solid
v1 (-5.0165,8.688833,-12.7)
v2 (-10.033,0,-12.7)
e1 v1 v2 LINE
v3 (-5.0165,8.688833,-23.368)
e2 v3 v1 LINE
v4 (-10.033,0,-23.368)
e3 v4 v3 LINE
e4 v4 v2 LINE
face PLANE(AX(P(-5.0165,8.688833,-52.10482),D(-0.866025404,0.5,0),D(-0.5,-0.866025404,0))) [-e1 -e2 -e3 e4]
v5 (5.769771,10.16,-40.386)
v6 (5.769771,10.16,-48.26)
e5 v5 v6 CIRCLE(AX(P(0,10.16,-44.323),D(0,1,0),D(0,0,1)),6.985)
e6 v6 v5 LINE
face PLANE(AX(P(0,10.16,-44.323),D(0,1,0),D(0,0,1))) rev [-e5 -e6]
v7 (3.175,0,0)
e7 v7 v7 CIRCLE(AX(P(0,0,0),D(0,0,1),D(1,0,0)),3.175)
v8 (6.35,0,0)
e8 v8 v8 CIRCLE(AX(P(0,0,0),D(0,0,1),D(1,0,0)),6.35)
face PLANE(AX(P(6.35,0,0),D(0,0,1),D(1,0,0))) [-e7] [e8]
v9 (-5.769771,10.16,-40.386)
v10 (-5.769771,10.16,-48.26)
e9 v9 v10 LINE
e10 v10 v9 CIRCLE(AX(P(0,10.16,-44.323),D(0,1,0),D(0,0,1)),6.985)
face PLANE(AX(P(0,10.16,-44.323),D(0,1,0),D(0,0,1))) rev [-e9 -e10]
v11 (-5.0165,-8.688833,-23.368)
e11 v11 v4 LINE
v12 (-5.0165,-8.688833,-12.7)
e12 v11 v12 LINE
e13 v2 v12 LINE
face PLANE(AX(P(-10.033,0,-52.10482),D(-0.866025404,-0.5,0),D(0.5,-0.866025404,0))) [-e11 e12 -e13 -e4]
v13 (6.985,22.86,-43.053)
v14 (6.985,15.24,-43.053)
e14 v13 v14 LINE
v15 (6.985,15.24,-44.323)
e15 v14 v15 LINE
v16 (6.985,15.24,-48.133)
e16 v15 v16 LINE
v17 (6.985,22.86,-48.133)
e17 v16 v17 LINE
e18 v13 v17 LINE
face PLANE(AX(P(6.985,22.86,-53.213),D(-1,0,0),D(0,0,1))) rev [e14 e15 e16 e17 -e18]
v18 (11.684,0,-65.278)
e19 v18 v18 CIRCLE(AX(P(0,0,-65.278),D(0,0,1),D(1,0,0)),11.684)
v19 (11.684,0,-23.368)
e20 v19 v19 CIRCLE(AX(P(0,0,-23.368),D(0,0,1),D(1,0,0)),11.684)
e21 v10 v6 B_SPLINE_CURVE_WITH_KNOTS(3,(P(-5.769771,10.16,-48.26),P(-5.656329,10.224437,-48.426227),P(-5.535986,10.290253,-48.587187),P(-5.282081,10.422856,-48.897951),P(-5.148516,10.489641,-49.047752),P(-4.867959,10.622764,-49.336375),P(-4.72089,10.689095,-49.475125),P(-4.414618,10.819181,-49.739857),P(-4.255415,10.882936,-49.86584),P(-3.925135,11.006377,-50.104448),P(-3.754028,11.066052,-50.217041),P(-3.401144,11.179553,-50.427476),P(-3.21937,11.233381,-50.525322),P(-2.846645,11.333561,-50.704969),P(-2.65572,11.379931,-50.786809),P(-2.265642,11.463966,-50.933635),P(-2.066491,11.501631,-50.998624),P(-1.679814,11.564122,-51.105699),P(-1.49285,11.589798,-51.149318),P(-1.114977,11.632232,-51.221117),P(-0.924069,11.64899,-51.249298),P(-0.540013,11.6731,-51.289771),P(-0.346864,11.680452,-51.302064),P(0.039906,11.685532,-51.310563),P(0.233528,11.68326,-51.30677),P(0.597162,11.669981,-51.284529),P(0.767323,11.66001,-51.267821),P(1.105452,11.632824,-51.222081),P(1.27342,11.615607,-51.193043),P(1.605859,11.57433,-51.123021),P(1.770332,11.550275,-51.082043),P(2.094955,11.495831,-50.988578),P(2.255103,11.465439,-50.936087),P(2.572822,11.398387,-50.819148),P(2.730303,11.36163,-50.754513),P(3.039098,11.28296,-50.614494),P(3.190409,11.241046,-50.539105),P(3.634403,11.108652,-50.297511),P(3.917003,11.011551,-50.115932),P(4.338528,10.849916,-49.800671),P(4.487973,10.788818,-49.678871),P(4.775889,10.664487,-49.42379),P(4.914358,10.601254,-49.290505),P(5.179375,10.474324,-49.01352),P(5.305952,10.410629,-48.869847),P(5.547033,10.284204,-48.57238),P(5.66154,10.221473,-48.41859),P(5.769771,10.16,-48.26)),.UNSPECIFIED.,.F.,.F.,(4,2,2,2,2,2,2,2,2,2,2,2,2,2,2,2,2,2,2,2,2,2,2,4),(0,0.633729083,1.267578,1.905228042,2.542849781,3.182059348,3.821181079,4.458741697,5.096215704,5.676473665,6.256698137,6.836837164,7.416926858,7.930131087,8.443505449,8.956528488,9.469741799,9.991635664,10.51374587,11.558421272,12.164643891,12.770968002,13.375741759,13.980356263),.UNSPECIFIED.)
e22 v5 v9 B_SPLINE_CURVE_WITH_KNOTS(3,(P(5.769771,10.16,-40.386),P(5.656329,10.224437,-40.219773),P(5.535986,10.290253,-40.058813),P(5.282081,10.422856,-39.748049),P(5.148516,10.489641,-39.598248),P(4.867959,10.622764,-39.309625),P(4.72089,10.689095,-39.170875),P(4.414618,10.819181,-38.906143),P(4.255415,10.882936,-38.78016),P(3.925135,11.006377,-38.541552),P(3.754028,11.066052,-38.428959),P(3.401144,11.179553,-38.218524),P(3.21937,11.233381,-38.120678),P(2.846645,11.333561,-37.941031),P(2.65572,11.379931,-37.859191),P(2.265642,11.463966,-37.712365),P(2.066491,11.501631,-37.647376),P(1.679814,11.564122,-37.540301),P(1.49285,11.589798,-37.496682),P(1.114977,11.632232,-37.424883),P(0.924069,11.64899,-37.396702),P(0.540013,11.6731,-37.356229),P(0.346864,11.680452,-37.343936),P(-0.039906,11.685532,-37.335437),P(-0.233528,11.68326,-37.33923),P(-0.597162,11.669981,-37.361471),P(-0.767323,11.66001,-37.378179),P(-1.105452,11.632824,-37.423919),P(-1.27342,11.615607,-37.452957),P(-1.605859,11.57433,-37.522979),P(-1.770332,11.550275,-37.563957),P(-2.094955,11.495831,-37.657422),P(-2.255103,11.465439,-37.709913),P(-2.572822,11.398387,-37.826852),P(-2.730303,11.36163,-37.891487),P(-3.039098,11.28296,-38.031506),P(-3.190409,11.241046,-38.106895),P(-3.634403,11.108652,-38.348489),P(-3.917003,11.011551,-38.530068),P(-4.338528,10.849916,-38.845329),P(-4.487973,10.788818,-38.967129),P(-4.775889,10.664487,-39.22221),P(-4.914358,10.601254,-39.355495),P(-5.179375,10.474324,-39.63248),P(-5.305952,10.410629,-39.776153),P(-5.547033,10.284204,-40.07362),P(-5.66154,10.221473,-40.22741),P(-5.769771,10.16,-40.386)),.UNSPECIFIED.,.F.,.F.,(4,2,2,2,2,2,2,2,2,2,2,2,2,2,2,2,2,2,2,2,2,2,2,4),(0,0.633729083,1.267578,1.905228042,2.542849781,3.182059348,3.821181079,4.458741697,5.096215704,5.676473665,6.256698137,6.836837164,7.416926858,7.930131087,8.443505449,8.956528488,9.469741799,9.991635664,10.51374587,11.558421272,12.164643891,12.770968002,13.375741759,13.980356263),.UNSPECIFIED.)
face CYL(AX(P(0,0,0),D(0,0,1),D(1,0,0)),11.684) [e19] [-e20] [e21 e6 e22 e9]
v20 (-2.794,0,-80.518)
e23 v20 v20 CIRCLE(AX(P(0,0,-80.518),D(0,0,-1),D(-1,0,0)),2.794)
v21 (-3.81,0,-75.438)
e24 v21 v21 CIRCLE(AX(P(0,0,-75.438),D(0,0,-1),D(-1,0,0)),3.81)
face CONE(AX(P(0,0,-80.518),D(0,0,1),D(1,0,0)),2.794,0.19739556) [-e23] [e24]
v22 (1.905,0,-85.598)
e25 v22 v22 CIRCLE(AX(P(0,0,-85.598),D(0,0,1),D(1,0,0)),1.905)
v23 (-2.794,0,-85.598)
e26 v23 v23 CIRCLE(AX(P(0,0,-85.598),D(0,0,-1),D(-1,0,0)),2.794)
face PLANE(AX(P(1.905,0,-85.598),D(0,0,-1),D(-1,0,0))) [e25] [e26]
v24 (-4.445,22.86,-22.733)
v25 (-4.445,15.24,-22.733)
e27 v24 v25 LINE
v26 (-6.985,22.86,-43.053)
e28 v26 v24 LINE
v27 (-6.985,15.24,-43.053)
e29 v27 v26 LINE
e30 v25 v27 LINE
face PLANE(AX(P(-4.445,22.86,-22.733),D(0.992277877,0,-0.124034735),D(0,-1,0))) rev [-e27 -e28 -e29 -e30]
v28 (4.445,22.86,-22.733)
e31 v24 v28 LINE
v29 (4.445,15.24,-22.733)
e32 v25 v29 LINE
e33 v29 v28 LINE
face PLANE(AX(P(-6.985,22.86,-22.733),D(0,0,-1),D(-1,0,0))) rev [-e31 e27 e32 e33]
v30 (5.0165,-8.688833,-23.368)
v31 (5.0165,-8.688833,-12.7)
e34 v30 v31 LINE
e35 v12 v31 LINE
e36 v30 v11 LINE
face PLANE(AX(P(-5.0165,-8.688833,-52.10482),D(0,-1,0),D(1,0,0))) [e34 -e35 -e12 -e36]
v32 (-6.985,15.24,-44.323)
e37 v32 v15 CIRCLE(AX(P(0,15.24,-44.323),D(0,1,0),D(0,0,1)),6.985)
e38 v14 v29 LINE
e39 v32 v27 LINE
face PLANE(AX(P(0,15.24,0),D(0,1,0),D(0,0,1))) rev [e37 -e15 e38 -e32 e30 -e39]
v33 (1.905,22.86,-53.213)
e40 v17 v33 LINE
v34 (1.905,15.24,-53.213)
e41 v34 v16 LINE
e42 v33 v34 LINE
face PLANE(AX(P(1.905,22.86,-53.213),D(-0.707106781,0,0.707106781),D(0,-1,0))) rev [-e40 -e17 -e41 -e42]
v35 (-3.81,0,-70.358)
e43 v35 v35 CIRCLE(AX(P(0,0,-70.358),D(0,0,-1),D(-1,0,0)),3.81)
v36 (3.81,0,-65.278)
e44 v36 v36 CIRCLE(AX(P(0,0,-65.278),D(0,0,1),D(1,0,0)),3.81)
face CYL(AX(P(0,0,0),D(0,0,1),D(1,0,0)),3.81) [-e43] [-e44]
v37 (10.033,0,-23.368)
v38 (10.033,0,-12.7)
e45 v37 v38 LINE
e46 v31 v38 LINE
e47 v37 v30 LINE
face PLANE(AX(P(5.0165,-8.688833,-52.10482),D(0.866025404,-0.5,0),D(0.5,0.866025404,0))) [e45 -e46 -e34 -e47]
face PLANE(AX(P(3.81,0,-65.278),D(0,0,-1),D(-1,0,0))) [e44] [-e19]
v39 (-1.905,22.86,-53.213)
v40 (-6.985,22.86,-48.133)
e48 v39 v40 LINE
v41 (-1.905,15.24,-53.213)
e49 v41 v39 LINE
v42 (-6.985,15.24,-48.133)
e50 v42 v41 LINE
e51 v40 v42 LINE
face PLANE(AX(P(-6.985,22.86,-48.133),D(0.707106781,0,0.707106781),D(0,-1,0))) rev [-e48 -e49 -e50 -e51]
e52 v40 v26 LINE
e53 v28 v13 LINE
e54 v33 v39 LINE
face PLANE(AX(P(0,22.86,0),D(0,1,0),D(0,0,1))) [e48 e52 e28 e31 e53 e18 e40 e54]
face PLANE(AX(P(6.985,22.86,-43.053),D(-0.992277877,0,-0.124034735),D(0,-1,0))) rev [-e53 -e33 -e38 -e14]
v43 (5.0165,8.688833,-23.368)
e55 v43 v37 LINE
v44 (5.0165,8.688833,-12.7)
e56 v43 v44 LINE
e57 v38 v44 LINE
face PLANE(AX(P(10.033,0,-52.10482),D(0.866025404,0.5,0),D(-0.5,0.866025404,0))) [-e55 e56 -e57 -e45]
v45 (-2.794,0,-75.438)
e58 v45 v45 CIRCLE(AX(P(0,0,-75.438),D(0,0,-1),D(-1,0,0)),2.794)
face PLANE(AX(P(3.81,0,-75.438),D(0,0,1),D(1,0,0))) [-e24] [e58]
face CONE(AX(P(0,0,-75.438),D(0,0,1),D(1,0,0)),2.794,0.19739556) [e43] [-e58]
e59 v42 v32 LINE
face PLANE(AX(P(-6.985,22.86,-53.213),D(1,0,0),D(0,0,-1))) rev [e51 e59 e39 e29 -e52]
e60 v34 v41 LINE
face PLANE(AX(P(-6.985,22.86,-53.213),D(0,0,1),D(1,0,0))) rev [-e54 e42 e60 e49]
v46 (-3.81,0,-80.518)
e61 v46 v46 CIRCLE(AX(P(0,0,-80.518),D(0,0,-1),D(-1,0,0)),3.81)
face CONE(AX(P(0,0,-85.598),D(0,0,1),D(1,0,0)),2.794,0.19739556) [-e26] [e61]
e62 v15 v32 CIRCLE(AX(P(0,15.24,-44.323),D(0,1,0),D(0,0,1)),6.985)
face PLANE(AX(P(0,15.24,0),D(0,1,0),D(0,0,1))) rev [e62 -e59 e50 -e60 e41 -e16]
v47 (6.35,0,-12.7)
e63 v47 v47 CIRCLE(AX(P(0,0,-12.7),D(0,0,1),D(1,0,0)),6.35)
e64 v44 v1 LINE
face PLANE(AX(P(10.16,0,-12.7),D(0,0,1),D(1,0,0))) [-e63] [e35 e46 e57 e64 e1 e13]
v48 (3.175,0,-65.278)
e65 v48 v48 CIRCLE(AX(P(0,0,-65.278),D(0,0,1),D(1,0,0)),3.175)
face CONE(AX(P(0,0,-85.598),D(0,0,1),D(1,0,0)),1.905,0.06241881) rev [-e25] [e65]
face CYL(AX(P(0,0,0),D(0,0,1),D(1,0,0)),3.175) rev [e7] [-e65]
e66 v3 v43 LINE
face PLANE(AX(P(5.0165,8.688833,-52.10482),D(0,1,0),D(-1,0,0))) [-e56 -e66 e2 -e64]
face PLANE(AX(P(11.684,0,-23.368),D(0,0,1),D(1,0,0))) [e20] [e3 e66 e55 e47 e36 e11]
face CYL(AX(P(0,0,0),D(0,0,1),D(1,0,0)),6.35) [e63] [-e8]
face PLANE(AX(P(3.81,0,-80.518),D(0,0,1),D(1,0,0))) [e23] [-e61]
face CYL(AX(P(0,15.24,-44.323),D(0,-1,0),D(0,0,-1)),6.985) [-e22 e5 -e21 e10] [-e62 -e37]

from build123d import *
from OCP.BRepFilletAPI import BRepFilletAPI_MakeChamfer

# Parameters (mm, degrees)
SKETCH3_R           = 10.16
CUT_EXTRUDE1_DEPTH  = 10.668
SKETCH4_R           = 6.985
BOSS_EXTRUDE1_DEPTH = 5.08
SKETCH5_W           = 13.97
SKETCH5_H           = 30.48
BOSS_EXTRUDE2_DEPTH = 7.62
CHAMFER1_SIZE       = 5.08
CHAMFER2_SIZE       = 20.32
CHAMFER2_SIZE2      = 2.54


# Read off the part's stored shape, not the designer's step: LPattern8
with BuildPart() as part:
    # Sketch1 → Revolve1 (revolve)
    with BuildSketch(Plane(origin=(0, 0, 0), x_dir=(1, 0, 0), z_dir=(0, 1, 0))):
        Polygon((3.81, 85.598), (3.81, 65.278), (11.684, 65.278), (11.684, 23.368), (10.16, 23.368), (10.16, 12.7), (6.35, 12.7), (6.35, 0), (3.175, 0), (3.175, 65.278), (1.905, 85.598), align=None)
    revolve(axis=Axis((0, 0, 0), (0, 0, -1)))

    # Sketch2 → Cut-Revolve1 (revolve, cut)
    with BuildSketch(Plane(origin=(0, 0, 0), x_dir=(1, 0, 0), z_dir=(0, 1, 0))):
        Polygon((3.81, 85.598), (2.794, 85.598), (3.81, 80.518), align=None)
    revolve(axis=Axis((0, 0, 0), (0, 0, 1)), mode=Mode.SUBTRACT)

    # LPattern8 outline → LPattern8 (revolve, cut)
    with BuildSketch(Plane.XZ):
        Polygon((3.81, -75.438), (2.794, -80.518), (3.81, -80.518), align=None)
        Polygon((2.794, -75.438), (3.81, -75.438), (3.81, -70.358), align=None)
    revolve(axis=Axis((0, 0, 0), (0, 0, 1)), mode=Mode.SUBTRACT)

    # Sketch3 → Cut-Extrude1 (cut)
    with BuildSketch(Plane.XY.offset(-12.7)):
        Circle(SKETCH3_R)
        Polygon((5.0165, -8.688832876), (10.033, 0), (5.0165, 8.688832876), (-5.0165, 8.688832876), (-10.033, 0), (-5.0165, -8.688832876), align=None, mode=Mode.SUBTRACT)
    extrude(amount=-CUT_EXTRUDE1_DEPTH, mode=Mode.SUBTRACT)

    # Sketch4 → Boss-Extrude1 (add)
    with BuildSketch(Plane(origin=(0, 10.16, 0), x_dir=(1, 0, 0), z_dir=(0, 1, 0))):
        with Locations(Location((0, 44.323, 0), (0, 0, 34.307651456))):
            Circle(SKETCH4_R)
    extrude(amount=BOSS_EXTRUDE1_DEPTH)

    # Sketch5 → Boss-Extrude2 (add)
    with BuildSketch(Plane(origin=(0, 15.24, 0), x_dir=(1, 0, 0), z_dir=(0, 1, 0))):
        with Locations((0, 37.973)):
            Rectangle(SKETCH5_W, SKETCH5_H)
    extrude(amount=BOSS_EXTRUDE2_DEPTH)

    # Chamfer1
    chamfer1_edges = [part.edges().sort_by_distance(p)[0] for p in [
        (-6.985, 19.05, -53.213),
        (6.985, 19.05, -53.213),
    ]]
    chamfer(chamfer1_edges, length=CHAMFER1_SIZE)

    # Chamfer2: one chamfer whose edges measure the first distance from different faces: ONE call of the kernel's chamfer builder (chamfer() names one face for all edges)
    chamfer2_edges_1 = [part.edges().sort_by_distance(p)[0] for p in [
        (-6.985, 19.05, -22.733),
    ]]
    chamfer2_side_1 = [part.faces().sort_by_distance(p)[0] for p in [
        (-6.985, 19.05, -35.433),
    ]]
    chamfer2_edges_2 = [part.edges().sort_by_distance(p)[0] for p in [
        (6.985, 19.05, -22.733),
    ]]
    chamfer2_side_2 = [part.faces().sort_by_distance(p)[0] for p in [
        (6.985, 19.05, -35.433),
    ]]
    chamfer2 = BRepFilletAPI_MakeChamfer(part.part.solid().wrapped)
    for e in chamfer2_edges_1:
        chamfer2.Add(CHAMFER2_SIZE, CHAMFER2_SIZE2, e.wrapped, chamfer2_side_1[0].wrapped)  # the first distance lies on this face
    for e in chamfer2_edges_2:
        chamfer2.Add(CHAMFER2_SIZE, CHAMFER2_SIZE2, e.wrapped, chamfer2_side_2[0].wrapped)  # the first distance lies on this face
    add(Compound.cast(chamfer2.Shape()), mode=Mode.REPLACE)


solid = part.part
